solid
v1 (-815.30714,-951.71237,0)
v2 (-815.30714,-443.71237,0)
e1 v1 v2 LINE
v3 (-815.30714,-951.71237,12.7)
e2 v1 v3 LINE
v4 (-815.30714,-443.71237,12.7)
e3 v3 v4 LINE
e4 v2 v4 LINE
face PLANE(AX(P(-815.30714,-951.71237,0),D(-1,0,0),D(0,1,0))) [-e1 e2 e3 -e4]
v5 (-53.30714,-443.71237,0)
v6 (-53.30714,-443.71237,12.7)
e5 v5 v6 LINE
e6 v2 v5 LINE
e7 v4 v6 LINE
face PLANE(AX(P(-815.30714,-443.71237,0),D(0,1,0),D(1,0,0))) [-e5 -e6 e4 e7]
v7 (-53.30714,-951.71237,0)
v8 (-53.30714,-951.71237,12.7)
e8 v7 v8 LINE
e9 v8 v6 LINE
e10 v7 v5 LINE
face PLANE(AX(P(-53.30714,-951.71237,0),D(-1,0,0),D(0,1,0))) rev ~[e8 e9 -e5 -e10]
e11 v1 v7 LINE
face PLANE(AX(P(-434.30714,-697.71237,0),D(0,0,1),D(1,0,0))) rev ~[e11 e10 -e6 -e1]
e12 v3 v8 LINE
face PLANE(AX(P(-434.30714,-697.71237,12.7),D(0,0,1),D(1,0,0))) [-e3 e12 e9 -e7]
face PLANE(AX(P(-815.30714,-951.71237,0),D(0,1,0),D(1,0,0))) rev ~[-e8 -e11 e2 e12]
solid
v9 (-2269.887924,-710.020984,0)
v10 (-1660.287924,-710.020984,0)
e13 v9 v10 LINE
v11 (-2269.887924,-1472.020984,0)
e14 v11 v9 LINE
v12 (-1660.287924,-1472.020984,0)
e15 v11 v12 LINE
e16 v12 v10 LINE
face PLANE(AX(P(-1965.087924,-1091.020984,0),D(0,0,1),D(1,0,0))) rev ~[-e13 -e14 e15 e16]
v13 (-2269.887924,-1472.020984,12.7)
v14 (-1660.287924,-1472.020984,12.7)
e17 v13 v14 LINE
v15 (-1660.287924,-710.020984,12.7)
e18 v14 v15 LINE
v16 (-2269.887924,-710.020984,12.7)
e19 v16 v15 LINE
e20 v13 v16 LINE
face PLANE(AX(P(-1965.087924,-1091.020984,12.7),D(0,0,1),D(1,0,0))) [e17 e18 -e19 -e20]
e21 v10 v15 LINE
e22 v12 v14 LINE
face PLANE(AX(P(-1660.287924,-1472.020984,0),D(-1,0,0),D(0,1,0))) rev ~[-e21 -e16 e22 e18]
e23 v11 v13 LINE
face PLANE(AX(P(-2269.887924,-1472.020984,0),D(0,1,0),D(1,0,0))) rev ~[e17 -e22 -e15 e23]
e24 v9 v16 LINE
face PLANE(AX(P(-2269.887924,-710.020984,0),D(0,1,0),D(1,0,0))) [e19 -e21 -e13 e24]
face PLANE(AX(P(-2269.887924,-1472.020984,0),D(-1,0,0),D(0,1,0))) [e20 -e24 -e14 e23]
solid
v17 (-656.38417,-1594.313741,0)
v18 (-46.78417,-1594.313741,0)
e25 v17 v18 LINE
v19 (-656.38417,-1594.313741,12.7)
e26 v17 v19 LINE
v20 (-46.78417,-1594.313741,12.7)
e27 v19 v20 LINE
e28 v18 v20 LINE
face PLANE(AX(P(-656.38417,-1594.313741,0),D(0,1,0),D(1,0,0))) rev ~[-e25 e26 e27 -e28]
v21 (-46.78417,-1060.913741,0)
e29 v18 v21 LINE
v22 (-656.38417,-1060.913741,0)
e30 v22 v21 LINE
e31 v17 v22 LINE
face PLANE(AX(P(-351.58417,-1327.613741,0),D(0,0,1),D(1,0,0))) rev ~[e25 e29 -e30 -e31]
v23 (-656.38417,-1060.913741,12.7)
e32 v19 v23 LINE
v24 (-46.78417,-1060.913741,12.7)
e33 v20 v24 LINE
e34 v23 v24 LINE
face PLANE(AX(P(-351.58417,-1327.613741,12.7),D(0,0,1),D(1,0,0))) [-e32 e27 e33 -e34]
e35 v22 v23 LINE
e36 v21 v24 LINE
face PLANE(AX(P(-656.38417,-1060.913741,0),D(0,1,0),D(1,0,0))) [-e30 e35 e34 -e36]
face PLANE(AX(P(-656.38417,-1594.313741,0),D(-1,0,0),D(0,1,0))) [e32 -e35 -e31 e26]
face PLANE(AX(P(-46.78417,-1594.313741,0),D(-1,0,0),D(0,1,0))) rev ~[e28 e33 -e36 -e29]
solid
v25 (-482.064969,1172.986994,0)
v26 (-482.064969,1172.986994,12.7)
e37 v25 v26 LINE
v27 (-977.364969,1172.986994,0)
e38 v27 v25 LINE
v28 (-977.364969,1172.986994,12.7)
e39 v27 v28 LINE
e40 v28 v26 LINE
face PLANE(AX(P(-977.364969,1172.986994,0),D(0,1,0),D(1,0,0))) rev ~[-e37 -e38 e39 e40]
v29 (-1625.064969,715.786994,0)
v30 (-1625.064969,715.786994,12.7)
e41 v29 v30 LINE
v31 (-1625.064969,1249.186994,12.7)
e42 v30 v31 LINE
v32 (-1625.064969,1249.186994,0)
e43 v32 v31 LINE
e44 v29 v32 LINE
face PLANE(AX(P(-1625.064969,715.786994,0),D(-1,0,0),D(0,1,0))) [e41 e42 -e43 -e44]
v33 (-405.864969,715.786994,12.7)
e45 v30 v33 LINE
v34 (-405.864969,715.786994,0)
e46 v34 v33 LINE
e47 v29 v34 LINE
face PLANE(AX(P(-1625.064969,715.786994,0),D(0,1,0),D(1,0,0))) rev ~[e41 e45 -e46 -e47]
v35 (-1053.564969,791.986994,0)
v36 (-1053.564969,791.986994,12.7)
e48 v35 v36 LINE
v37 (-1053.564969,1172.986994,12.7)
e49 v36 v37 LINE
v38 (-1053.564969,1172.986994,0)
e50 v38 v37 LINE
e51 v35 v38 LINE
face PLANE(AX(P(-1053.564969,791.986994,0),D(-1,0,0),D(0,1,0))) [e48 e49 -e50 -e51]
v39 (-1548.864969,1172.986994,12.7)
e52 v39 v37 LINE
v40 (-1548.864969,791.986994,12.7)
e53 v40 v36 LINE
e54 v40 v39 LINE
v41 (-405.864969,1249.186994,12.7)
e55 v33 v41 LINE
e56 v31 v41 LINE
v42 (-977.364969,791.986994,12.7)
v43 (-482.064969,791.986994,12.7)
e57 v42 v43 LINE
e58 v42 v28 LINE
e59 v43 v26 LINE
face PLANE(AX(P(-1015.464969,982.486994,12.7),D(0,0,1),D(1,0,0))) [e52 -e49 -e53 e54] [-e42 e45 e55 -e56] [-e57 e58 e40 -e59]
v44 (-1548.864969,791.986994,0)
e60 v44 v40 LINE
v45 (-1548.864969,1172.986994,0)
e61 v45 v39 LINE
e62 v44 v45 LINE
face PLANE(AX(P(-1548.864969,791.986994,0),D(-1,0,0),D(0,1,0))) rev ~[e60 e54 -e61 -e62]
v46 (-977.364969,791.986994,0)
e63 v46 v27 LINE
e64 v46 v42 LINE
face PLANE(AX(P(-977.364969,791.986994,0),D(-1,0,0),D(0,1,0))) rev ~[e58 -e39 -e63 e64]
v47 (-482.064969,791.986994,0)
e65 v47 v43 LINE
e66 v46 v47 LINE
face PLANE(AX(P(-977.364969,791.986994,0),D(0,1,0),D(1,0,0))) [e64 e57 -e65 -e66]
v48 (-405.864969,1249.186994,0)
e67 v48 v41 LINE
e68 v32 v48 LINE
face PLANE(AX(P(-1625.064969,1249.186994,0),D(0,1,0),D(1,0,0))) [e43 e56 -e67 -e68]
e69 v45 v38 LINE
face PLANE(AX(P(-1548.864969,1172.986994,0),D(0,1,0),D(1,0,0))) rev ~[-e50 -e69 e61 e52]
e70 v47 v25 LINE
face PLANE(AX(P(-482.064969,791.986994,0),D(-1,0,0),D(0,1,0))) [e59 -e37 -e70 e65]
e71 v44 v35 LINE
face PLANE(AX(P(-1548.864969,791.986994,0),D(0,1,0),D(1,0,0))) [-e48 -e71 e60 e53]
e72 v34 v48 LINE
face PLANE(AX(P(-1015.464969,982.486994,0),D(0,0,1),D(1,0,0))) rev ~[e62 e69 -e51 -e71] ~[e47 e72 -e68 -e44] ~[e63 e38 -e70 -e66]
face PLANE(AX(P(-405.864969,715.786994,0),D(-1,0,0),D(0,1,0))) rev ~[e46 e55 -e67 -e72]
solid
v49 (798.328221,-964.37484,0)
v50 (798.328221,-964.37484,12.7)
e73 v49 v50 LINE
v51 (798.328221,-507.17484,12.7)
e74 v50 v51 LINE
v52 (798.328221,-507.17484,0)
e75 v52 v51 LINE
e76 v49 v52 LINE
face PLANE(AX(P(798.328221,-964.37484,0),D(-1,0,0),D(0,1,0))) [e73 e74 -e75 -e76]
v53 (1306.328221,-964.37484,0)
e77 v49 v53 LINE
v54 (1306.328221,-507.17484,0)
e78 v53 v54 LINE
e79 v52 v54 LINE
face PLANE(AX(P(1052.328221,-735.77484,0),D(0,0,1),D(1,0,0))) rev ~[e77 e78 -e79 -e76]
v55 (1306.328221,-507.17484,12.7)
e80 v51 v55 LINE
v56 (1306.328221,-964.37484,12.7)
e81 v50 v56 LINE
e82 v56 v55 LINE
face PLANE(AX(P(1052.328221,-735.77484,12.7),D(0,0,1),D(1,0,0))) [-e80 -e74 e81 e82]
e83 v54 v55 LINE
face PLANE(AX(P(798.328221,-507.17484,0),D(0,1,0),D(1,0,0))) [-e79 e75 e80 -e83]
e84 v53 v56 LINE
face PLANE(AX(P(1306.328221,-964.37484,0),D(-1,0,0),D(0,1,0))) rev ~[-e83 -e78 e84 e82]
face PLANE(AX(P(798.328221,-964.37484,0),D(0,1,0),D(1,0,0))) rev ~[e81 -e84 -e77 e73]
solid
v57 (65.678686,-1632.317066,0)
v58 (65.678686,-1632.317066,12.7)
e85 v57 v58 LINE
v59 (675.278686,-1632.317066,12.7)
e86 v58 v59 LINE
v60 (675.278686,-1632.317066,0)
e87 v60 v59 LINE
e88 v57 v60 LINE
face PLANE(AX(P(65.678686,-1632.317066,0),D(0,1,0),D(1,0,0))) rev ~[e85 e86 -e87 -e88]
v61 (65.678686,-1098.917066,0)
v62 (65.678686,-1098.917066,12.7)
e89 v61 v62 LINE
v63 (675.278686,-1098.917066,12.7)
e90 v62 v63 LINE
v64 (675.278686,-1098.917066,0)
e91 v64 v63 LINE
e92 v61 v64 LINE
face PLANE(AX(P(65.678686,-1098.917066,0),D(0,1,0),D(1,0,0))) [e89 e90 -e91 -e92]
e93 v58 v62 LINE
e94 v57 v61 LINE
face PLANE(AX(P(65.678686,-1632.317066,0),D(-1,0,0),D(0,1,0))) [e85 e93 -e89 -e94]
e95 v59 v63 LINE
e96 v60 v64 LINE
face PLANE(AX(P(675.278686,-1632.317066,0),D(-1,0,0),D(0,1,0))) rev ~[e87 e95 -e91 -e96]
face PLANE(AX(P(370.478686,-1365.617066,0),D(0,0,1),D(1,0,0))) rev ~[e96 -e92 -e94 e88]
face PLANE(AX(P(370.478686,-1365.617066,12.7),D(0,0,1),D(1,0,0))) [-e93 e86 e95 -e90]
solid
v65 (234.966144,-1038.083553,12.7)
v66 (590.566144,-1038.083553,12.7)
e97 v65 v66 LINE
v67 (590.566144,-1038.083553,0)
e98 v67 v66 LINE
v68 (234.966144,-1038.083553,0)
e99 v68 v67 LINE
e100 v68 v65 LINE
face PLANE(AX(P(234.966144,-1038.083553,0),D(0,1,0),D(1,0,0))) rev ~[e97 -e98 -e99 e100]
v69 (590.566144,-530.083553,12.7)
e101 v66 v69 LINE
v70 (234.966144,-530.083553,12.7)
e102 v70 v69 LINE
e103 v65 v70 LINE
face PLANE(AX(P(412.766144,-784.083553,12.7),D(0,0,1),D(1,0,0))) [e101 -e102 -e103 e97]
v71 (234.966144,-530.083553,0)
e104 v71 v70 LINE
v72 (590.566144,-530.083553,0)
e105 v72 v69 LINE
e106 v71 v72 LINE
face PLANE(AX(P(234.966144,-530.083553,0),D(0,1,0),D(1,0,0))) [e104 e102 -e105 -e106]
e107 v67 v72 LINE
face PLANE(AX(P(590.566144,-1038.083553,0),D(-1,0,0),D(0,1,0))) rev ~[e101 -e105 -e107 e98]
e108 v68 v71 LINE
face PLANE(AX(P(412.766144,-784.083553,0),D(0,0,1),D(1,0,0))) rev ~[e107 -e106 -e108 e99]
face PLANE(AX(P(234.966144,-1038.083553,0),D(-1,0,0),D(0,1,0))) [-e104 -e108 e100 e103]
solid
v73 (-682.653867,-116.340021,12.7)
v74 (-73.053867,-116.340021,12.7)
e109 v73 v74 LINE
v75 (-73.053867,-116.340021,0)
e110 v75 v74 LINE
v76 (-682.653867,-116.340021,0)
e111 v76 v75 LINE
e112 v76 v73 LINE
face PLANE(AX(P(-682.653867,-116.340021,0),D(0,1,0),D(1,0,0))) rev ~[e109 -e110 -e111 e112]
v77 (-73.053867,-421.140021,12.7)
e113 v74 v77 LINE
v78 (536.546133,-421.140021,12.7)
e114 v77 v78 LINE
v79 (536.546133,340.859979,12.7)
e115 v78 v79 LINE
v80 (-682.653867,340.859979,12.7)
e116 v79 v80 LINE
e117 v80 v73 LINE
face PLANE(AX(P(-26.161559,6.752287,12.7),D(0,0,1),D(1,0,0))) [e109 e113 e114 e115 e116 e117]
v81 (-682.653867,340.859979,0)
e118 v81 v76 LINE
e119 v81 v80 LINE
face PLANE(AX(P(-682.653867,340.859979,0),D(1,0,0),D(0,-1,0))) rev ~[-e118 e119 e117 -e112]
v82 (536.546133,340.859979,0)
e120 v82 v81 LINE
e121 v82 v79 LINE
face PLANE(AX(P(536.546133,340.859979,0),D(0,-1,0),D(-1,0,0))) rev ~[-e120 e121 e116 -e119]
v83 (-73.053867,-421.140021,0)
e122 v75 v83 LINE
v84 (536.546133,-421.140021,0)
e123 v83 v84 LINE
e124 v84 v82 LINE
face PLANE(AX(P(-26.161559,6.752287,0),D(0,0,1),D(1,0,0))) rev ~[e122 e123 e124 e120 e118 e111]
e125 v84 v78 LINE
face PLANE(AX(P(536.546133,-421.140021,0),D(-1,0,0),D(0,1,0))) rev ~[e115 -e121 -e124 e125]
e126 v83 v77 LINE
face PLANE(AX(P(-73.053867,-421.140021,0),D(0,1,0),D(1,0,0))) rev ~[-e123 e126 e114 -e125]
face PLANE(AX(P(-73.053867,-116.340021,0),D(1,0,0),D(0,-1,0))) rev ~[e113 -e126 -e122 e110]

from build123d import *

# Parameters (mm, degrees)
F1_DEPTH = 12.7
F0_W     = 762
F0_H     = 508
F0_W_2   = 609.6
F0_H_2   = 533.4
F0_W_3   = 355.6
F0_W_4   = 508
F0_H_3   = 457.2
F0_H_4   = 762
F0_W_5   = 1219.2
F0_W_6   = 495.3
F0_H_5   = 381


# Not quite as in the source:
# - a feature names something its author has since deleted; it is built from what else it names


with BuildPart() as f1:
    # F0 (on Top) → F1 (new body)
    with BuildSketch(Plane.XY):
        Polygon((536.5461329095, 340.8599793494), (-682.6538670905, 340.8599793494), (-682.6538670905, -116.3400206506), (-73.0538670905, -116.3400206506), (-73.0538670905, -421.1400206506), (536.5461329095, -421.1400206506), align=None)
    extrude(amount=F1_DEPTH)


with BuildPart() as f1b:
    # F0 (on Top) → F1, piece 2 (new body)
    with BuildSketch(Plane.XY):
        with Locations((-434.3071403503, -697.7123699188)):
            Rectangle(F0_W, F0_H)
    extrude(amount=F1_DEPTH)


with BuildPart() as f1c:
    # F0 (on Top) → F1, piece 3 (new body)
    with BuildSketch(Plane.XY):
        with Locations((-351.5841700554, -1327.6137407303)):
            Rectangle(F0_W_2, F0_H_2)
    extrude(amount=F1_DEPTH)


with BuildPart() as f1d:
    # F0 (on Top) → F1, piece 4 (new body)
    with BuildSketch(Plane.XY):
        with Locations((370.4786859035, -1365.6170661926)):
            Rectangle(F0_W_2, F0_H_2)
    extrude(amount=F1_DEPTH)


with BuildPart() as f1e:
    # F0 (on Top) → F1, piece 5 (new body)
    with BuildSketch(Plane.XY):
        with Locations((412.7661439657, -784.0835533142)):
            Rectangle(F0_W_3, F0_H)
    extrude(amount=F1_DEPTH)


with BuildPart() as f1f:
    # F0 (on Top) → F1, piece 6 (new body)
    with BuildSketch(Plane.XY):
        with Locations((1052.3282208443, -735.7748402596)):
            Rectangle(F0_W_4, F0_H_3)
    extrude(amount=F1_DEPTH)


with BuildPart() as f1g:
    # F0 (on Top) → F1, piece 7 (new body)
    with BuildSketch(Plane.XY):
        with Locations((-1965.0879241943, -1091.020983696)):
            Rectangle(F0_W_2, F0_H_4)
    extrude(amount=F1_DEPTH)


with BuildPart() as f1h:
    # F0 (on Top) → F1, piece 8 (new body)
    with BuildSketch(Plane.XY):
        with Locations((-1015.4649690628, 982.4869935036)):
            Rectangle(F0_W_5, F0_H_2)
        with Locations((-1301.2149690628, 982.4869935036)):
            Rectangle(F0_W_6, F0_H_5, mode=Mode.SUBTRACT)
        with Locations((-729.7149690628, 982.4869935036)):
            Rectangle(F0_W_6, F0_H_5, mode=Mode.SUBTRACT)
    extrude(amount=F1_DEPTH)


solid = Compound([f1.part, f1b.part, f1c.part, f1d.part, f1e.part, f1f.part, f1g.part, f1h.part])
